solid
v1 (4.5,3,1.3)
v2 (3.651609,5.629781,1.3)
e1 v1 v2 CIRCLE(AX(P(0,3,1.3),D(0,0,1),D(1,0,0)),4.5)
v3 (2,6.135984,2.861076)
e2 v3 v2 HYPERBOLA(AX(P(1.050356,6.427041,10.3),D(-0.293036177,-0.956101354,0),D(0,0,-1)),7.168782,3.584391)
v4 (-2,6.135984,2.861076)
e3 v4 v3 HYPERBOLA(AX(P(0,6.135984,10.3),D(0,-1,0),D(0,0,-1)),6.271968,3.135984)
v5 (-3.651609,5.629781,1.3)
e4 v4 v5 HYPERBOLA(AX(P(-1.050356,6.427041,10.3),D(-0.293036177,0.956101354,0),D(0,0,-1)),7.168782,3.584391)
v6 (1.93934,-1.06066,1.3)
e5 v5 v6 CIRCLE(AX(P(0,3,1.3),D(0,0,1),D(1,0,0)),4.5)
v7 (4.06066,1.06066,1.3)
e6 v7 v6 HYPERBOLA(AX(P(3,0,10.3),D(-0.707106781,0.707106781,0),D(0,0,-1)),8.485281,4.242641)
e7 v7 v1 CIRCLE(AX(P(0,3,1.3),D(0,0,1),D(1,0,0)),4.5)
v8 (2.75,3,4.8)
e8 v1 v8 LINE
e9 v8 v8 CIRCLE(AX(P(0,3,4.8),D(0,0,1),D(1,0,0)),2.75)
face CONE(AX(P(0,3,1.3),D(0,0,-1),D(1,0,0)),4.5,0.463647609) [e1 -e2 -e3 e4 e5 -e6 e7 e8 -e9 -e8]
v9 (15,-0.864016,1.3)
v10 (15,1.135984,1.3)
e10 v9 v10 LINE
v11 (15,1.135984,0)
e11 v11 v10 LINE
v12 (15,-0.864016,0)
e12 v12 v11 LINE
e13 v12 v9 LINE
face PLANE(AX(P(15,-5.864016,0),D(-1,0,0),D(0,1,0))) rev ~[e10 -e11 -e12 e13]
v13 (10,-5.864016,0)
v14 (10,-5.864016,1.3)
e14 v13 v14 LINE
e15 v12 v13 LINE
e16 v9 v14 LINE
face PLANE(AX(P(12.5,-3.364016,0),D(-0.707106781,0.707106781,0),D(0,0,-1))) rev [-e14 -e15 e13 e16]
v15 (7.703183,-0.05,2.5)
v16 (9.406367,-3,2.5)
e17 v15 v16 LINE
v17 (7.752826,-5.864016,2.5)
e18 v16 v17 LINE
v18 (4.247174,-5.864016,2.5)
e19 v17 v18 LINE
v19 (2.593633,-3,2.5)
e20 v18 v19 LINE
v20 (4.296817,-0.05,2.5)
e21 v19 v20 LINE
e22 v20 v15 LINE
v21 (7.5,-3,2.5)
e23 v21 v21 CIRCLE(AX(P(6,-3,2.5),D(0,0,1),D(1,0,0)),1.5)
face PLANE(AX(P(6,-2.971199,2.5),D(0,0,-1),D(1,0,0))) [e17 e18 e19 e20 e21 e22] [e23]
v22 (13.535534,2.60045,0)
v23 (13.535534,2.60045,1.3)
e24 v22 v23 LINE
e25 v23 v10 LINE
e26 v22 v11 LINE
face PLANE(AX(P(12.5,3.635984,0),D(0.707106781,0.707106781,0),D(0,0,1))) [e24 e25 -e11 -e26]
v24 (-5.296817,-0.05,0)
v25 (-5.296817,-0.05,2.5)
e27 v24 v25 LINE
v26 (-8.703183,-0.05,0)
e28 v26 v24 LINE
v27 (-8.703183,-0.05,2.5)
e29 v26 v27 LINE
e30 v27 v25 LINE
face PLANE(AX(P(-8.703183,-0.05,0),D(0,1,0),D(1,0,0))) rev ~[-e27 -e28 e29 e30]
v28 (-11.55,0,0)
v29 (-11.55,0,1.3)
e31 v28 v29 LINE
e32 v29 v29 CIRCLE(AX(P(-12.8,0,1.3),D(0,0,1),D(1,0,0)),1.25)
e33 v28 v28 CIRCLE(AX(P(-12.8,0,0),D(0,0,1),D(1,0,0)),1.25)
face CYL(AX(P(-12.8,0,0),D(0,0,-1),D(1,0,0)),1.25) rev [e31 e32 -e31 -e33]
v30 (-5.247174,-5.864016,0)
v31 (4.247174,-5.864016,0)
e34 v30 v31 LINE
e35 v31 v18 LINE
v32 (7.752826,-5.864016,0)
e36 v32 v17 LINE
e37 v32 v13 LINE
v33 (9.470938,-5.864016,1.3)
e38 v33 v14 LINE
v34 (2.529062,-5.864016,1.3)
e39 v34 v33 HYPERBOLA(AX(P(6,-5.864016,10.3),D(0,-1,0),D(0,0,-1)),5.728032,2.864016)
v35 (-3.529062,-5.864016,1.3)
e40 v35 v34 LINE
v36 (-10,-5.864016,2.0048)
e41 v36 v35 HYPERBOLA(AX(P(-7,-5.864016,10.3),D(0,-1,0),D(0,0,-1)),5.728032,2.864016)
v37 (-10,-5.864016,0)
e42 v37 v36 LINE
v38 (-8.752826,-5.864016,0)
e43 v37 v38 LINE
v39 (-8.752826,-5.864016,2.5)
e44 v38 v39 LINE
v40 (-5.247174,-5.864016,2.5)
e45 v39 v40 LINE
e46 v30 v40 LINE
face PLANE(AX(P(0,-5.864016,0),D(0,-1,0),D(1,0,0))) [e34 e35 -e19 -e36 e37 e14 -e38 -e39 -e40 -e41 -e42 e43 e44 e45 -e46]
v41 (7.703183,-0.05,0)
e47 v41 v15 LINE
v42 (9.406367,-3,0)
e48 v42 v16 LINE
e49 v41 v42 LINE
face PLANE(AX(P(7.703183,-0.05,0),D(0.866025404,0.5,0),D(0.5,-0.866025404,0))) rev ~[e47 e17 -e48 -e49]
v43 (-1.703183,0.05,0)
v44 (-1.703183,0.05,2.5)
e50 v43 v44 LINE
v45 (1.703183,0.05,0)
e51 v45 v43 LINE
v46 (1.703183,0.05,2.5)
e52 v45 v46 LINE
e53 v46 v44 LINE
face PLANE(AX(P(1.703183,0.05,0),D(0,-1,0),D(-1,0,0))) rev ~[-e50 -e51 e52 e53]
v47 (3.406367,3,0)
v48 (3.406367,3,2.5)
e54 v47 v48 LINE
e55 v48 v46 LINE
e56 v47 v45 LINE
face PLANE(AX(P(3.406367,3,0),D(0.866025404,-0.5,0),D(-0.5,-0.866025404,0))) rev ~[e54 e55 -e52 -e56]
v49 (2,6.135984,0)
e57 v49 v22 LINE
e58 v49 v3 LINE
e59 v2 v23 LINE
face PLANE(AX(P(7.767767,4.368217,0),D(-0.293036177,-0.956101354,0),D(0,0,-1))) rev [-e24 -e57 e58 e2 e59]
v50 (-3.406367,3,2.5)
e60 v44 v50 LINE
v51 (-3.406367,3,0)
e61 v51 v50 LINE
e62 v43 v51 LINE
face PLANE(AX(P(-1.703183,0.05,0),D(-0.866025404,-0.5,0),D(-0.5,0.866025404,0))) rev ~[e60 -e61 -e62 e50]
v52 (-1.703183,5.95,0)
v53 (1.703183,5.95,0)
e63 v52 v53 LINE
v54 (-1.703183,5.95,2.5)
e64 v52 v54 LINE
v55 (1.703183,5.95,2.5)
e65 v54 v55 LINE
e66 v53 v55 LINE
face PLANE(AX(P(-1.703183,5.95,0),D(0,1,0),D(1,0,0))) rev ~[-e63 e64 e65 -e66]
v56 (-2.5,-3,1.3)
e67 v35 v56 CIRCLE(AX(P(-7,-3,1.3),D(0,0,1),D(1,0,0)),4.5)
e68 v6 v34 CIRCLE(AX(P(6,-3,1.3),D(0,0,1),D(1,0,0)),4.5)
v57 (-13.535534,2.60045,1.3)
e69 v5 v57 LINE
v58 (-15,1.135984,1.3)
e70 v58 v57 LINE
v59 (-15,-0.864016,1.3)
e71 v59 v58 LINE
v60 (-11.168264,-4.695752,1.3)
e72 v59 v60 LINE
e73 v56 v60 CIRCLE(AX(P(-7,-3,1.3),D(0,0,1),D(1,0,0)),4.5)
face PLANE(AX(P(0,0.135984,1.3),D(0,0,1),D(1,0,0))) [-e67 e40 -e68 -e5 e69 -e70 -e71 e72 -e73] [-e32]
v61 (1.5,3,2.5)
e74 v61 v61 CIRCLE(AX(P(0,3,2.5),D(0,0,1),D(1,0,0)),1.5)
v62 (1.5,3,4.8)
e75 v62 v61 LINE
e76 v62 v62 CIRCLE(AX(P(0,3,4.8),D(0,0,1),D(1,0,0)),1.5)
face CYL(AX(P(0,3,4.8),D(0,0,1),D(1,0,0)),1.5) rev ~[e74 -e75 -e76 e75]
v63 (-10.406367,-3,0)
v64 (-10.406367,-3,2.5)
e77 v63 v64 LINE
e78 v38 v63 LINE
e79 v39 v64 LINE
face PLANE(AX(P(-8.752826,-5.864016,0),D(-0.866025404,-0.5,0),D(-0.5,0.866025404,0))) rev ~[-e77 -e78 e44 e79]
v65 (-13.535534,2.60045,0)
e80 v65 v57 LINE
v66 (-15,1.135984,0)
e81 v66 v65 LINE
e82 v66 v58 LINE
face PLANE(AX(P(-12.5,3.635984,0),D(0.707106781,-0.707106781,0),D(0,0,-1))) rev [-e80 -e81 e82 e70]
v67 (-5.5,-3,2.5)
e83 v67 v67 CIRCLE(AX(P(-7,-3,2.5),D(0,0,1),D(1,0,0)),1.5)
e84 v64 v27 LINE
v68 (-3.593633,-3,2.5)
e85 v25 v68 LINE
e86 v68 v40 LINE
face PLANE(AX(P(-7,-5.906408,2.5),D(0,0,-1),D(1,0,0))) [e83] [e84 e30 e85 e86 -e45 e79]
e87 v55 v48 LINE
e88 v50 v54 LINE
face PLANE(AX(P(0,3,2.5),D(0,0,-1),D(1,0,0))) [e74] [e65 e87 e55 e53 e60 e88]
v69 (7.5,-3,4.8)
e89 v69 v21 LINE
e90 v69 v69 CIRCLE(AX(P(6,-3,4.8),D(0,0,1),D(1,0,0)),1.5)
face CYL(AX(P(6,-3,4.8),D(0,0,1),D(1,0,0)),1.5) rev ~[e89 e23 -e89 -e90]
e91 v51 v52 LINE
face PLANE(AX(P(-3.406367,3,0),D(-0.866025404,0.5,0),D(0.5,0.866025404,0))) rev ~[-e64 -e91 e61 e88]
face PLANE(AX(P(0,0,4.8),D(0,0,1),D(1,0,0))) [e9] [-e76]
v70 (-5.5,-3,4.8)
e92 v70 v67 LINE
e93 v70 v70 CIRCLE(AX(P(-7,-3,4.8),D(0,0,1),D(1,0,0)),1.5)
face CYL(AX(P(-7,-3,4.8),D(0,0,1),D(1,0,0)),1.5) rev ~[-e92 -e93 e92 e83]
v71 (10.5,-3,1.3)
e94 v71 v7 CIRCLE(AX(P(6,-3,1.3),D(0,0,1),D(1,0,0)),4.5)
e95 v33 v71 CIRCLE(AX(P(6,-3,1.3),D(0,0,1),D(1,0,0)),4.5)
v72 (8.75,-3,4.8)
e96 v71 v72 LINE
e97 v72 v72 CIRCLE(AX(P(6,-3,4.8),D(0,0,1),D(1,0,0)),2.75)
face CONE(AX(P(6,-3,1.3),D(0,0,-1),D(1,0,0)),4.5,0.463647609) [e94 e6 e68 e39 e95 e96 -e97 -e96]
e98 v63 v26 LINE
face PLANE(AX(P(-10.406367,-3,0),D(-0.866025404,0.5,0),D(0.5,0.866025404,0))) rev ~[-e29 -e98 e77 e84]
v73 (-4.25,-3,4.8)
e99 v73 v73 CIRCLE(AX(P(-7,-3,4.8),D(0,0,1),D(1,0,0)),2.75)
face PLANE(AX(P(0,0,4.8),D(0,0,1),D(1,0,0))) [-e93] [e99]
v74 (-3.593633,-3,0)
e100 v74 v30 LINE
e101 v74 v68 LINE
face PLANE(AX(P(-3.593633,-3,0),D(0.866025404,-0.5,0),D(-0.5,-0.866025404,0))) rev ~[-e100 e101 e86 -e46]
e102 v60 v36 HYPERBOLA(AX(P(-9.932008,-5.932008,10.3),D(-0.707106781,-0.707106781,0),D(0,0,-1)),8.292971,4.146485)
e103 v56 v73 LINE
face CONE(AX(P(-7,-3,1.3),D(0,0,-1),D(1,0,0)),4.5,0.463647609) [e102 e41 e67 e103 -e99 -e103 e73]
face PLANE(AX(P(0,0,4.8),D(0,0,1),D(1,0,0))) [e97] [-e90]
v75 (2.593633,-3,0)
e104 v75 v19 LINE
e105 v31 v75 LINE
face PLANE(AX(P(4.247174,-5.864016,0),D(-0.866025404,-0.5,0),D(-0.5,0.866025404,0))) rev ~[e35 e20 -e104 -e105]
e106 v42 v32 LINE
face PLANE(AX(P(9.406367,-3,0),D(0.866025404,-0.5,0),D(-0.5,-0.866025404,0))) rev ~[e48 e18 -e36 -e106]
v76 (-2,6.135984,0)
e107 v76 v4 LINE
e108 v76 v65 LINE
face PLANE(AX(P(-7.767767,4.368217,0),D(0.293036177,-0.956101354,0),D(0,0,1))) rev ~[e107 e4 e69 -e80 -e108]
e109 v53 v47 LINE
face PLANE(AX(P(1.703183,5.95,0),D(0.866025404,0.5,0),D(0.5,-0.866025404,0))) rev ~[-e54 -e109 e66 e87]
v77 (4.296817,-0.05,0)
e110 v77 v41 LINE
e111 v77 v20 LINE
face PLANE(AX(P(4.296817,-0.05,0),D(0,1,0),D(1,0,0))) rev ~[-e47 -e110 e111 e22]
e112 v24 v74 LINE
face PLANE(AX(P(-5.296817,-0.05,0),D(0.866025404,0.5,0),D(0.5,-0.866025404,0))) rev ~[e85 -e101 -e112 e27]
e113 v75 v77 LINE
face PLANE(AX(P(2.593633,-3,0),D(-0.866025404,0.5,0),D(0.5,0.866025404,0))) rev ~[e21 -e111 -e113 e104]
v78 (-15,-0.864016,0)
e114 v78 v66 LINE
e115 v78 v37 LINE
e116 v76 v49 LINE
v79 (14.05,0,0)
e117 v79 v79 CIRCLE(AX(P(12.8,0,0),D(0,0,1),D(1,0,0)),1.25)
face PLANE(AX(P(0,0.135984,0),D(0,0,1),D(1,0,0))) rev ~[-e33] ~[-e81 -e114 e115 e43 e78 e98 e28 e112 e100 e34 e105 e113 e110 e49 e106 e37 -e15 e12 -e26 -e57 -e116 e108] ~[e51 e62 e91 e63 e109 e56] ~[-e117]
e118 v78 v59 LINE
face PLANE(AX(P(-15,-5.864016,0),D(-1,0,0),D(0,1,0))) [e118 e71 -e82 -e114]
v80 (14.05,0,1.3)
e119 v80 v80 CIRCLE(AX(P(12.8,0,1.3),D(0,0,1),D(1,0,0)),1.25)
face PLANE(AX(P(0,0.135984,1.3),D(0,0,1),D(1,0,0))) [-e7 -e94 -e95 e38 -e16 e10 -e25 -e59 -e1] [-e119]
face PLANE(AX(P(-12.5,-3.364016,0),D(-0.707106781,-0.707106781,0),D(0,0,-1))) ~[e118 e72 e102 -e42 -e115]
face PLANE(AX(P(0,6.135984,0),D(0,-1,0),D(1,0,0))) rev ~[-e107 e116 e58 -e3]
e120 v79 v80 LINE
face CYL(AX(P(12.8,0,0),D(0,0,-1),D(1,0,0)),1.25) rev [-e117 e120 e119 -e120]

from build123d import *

# Parameters (mm, degrees)
F0_W     = 30
F0_H     = 12
F0_R     = 1.25
F1_DEPTH = 4.8
F2_R     = 1.5
F4_DEPTH = 4.8
F2_W     = 30
F2_H     = 12
F2_R_2   = 2.5
F2_R_3   = 1.25
F5_DEPTH = 3.5
F7_DEPTH = 2.5
F8_SIZE  = 5
F9_SIZE2 = 5
F9_SIZE  = 8


# Not quite as in the source:
# - a fillet or chamfer that OpenCascade refuses, or shapes differently, is made with other operations: its cross-section is extruded or revolved along the edge and cut away or added


with BuildPart() as f1:
    # F0 (on Top) → F1 (new body)
    with BuildSketch(Plane.XY):
        with Locations((0, 0.1359842196)):
            Rectangle(F0_W, F0_H)
        with Locations((-12.8, 0)):
            Circle(F0_R, mode=Mode.SUBTRACT)
        with Locations((12.8, 0)):
            Circle(F0_R, mode=Mode.SUBTRACT)
    extrude(amount=F1_DEPTH)

    # F2 (on face) → F4 (cut, through all)
    with BuildSketch(Plane.XY.offset(4.8)):
        with Locations((-7, -3)):
            Circle(F2_R)
        with Locations((0, 3)):
            Circle(F2_R)
        with Locations((6, -3)):
            Circle(F2_R)
    extrude(amount=-F4_DEPTH, mode=Mode.SUBTRACT)

    # F2 (on face) → F5 (cut)
    with BuildSketch(Plane.XY.offset(4.8)):
        with Locations((0, 0.1359842196)):
            Rectangle(F2_W, F2_H)
        with Locations((-7, -3)):
            Circle(F2_R_2, mode=Mode.SUBTRACT)
        with Locations((-12.8, 0)):
            Circle(F2_R_3, mode=Mode.SUBTRACT)
        with Locations((6, -3)):
            Circle(F2_R_2, mode=Mode.SUBTRACT)
        with Locations((12.8, 0)):
            Circle(F2_R_3, mode=Mode.SUBTRACT)
        with Locations((0, 3)):
            Circle(F2_R_2, mode=Mode.SUBTRACT)
    extrude(amount=-F5_DEPTH, mode=Mode.SUBTRACT)

    # F6: chamfer of 4 x 2 on 3 edges, made by hand


with BuildPart() as f6_tool2:
    # F6_s3 → F6_t4 (revolve)
    with BuildSketch(Plane.XZ.offset(3)):
        Polygon((-2.5, 1.3), (-4.5, 5.3), (-4.5, 1.3), align=None)
    revolve(axis=Axis((-7, -3, 1.3), (0, 0, 1)))

    split(bisect_by=Plane.XZ.offset(5.8640157804), keep=Keep.BOTTOM)

    split(bisect_by=Plane.XY.offset(4.8), keep=Keep.BOTTOM)


with BuildPart() as f1_1:
    add(f1.part)

    # F6_t1: union F6_tool2
    add(f6_tool2.part)


with BuildPart() as f6_tool8:
    # F6_s9 → F6_t10 (revolve)
    with BuildSketch(Plane.XZ.offset(-3)):
        Polygon((4.5, 1.3), (2.5, 5.3), (2.5, 1.3), align=None)
    revolve(axis=Axis((0, 3, 1.3), (0, 0, 1)))

    split(bisect_by=Plane.XZ.offset(-6.1359842196), keep=Keep.TOP)

    split(bisect_by=Plane.XY.offset(4.8), keep=Keep.BOTTOM)


with BuildPart() as f1_2:
    add(f1_1.part)

    # F6_t7: union F6_tool8
    add(f6_tool8.part)


with BuildPart() as f6_tool14:
    # F6_s15 → F6_t16 (revolve)
    with BuildSketch(Plane.XZ.offset(3)):
        Polygon((10.5, 1.3), (8.5, 5.3), (8.5, 1.3), align=None)
    revolve(axis=Axis((6, -3, 1.3), (0, 0, 1)))

    split(bisect_by=Plane.XZ.offset(5.8640157804), keep=Keep.BOTTOM)

    split(bisect_by=Plane.XY.offset(4.8), keep=Keep.BOTTOM)


with BuildPart() as f1_3:
    add(f1_2.part)

    # F6_t13: union F6_tool14
    add(f6_tool14.part)

    # F3 (on face) → F7 (cut)
    with BuildSketch(Plane(origin=(0, 0, 0), x_dir=(1, 0, 0), z_dir=(0, 0, -1))):
        Polygon((-5.2968167059, 5.95), (-8.7031832941, 5.95), (-8.7528263064, 5.8640157804), (-5.2471736936, 5.8640157804), align=None)
        Polygon((7.7528263064, 5.8640157804), (4.2471736936, 5.8640157804), (2.5936334118, 3), (4.2968167059, 0.05), (7.7031832941, 0.05), (9.4063665882, 3), align=None)
        Polygon((-1.7031832941, -5.95), (1.7031832941, -5.95), (3.4063665882, -3), (1.7031832941, -0.05), (-1.7031832941, -0.05), (-3.4063665882, -3), align=None)
        Polygon((-5.2471736936, 5.8640157804), (-8.7528263064, 5.8640157804), (-10.4063665882, 3), (-8.7031832941, 0.05), (-5.2968167059, 0.05), (-3.5936334118, 3), align=None)
    extrude(amount=-F7_DEPTH, mode=Mode.SUBTRACT)

    # F8 (call 1 of 4: OpenCascade refuses the feature's edges together)
    f8_edges = [f1_3.edges().sort_by_distance(p)[0] for p in [
        (-15, 6.135984, 0.65),
    ]]
    chamfer(f8_edges, length=F8_SIZE)

    # F8#2 (call 2 of 4)
    f8_2_edges = [f1_3.edges().sort_by_distance(p)[0] for p in [
        (-15, -5.864016, 0.65),
    ]]
    chamfer(f8_2_edges, length=F8_SIZE)

    # F8#3 (call 3 of 4)
    f8_3_edges = [f1_3.edges().sort_by_distance(p)[0] for p in [
        (15, 6.135984, 0.65),
    ]]
    chamfer(f8_3_edges, length=F8_SIZE)

    # F8#4 (call 4 of 4)
    f8_4_edges = [f1_3.edges().sort_by_distance(p)[0] for p in [
        (15, -5.864016, 0.65),
    ]]
    chamfer(f8_4_edges, length=F8_SIZE)

    # F9
    f9_edges = [f1_3.edges().sort_by_distance(p)[0] for p in [
        (10, 6.135984, 0.65),
        (-10, 6.135984, 0.65),
    ]]
    f9_side = f1_3.faces().sort_by_distance((0, 6.135984, 1.172283))[0]
    chamfer(f9_edges, length=F9_SIZE, length2=F9_SIZE2, reference=f9_side)


solid = f1_3.part
